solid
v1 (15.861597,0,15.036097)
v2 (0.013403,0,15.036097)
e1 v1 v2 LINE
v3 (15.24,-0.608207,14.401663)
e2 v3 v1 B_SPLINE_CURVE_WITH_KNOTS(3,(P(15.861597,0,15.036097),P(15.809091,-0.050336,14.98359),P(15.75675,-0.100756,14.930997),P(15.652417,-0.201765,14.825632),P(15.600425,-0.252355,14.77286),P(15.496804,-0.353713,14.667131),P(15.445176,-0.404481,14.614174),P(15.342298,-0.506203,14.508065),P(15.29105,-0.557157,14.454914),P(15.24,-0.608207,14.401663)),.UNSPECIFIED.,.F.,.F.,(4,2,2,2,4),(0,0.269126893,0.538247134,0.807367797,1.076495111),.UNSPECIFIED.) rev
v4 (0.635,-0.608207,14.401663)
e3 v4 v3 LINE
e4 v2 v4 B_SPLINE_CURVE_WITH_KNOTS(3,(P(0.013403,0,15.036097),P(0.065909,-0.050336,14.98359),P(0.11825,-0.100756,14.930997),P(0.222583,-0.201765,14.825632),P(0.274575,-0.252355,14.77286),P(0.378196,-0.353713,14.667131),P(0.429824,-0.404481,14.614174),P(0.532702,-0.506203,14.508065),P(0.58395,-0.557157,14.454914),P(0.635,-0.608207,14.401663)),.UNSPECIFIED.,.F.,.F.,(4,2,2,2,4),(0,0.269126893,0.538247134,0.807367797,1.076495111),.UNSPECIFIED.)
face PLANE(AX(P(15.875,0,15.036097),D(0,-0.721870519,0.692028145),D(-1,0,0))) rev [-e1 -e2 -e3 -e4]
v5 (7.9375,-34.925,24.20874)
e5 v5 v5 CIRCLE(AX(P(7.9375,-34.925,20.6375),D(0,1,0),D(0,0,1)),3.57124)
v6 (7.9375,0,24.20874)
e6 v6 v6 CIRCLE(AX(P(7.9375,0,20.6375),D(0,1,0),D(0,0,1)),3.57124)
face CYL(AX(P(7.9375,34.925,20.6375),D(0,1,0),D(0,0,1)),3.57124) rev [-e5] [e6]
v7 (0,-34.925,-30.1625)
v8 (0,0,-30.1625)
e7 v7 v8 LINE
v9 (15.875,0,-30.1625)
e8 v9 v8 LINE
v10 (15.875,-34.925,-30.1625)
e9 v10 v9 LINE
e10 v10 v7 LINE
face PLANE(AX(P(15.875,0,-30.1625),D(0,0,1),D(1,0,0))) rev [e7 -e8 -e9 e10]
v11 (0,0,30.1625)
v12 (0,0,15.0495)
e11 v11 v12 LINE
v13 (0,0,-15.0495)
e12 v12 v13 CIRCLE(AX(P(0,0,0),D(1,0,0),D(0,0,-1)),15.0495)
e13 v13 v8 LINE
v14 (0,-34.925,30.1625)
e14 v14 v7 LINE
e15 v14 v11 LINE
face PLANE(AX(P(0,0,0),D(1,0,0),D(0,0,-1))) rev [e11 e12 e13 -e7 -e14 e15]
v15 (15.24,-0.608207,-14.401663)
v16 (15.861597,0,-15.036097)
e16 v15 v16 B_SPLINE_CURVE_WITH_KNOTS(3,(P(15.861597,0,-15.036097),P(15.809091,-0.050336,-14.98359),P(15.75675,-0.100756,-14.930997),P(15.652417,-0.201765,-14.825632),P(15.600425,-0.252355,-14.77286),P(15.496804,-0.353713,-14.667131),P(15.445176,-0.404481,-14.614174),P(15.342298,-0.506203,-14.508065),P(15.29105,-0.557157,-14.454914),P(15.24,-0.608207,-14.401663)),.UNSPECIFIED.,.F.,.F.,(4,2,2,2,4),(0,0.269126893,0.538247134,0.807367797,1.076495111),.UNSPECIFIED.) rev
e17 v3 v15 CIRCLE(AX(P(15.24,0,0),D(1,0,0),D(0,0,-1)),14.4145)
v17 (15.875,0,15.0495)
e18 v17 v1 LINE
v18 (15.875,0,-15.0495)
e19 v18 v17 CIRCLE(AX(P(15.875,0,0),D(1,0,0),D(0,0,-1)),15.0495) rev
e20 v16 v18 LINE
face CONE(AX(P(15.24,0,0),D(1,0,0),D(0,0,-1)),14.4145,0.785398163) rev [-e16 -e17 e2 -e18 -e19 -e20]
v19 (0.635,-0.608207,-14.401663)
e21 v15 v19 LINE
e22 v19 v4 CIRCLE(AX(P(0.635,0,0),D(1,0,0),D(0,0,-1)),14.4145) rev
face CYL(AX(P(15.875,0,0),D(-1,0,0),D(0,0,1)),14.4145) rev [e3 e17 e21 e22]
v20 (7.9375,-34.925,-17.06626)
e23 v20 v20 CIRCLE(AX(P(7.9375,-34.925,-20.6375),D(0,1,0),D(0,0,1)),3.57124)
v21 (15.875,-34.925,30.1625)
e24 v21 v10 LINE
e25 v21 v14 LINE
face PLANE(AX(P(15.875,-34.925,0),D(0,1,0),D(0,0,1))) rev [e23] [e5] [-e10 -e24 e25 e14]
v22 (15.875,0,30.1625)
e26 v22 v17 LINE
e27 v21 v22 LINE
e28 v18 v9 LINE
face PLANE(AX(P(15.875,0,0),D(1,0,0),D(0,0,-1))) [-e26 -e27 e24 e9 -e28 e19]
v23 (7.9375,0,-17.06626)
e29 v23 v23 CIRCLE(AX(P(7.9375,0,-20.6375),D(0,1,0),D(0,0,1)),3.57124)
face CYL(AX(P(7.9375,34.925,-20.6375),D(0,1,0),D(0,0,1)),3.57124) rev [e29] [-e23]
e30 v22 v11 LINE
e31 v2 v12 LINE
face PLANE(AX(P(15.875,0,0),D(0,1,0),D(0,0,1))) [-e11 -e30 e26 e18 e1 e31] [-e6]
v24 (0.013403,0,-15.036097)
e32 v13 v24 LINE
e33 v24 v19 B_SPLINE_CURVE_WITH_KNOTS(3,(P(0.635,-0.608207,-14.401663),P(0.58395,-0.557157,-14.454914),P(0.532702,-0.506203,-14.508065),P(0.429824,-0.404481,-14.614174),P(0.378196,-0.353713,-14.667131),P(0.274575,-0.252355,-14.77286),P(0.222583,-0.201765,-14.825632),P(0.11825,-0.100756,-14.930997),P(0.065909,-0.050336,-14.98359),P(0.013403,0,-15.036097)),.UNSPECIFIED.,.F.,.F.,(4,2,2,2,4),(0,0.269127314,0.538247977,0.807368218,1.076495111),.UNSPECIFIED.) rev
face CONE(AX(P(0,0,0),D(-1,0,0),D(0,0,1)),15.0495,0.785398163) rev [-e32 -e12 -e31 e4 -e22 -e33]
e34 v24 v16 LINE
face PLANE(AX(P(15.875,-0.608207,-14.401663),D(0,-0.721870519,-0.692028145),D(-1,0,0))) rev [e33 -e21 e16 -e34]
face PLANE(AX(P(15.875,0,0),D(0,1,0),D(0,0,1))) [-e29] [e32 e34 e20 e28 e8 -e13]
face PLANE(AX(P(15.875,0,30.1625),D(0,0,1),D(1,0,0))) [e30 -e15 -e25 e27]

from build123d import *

# Parameters (mm, degrees)
BOSS_EXTRUDE1_DEPTH                           = 15.875
BOSS_EXTRUDE2_DEPTH                           = 15.875
CBORE_FOR_1_4_SOCKET_HEAD_CAP_SCREW1_AT_COUNT = 2
CBORE_FOR_1_4_SOCKET_HEAD_CAP_SCREW1_AT_PITCH = 41.275
MOVE_FACE1_BY                                 = 0.127
MOVE_FACE1_2_BY                               = 0.127
MOVE_START                                    = 28.575
MOVE_FACE2_OUTLINE_W                          = 15.875
MOVE_FACE2_OUTLINE_H                          = 60.325
MOVE_FACE2_OUTLINE_R                          = 5.55625
MOVE_FACE2_DEPTH                              = 6.35
MOVE_START_2                                  = 22.225
MOVE_FACE2_2_OUTLINE_R                        = 5.55625
MOVE_FACE2_2_OUTLINE_R_2                      = 3.57124
MOVE_FACE2_2_DEPTH                            = 6.35


with BuildPart() as part:
    # Sketch1 → Boss-Extrude1 (new body)
    with BuildSketch(Plane(origin=(0, 0, 0), x_dir=(0, 0, -1), z_dir=(1, 0, 0))):
        with BuildLine():
            Line((30.1625, 0), (14.2875, 0))
            ThreePointArc((14.2875, 0), (0, -14.2875), (-14.2875, 0))
            Line((-14.2875, 0), (-30.1625, 0))
            Line((-30.1625, 0), (-30.1625, -34.925))
            Line((-30.1625, -34.925), (30.1625, -34.925))
            Line((30.1625, -34.925), (30.1625, 0))
        make_face()
    extrude(amount=BOSS_EXTRUDE1_DEPTH)


with BuildPart() as body_2:
    # Sketch1<3> → Boss-Extrude2 (new body)
    with BuildSketch(Plane(origin=(0, 0, 0), x_dir=(0, 0, -1), z_dir=(1, 0, 0))):
        with BuildLine():
            ThreePointArc((-14.2875, 0), (0, 14.2875), (14.2875, 0))
            Line((14.2875, 0), (30.1625, 0))
            Line((30.1625, 0), (30.1625, 34.925))
            Line((30.1625, 34.925), (-30.1625, 34.925))
            Line((-30.1625, 34.925), (-30.1625, 0))
            Line((-30.1625, 0), (-14.2875, 0))
        make_face()
    extrude(amount=BOSS_EXTRUDE2_DEPTH)


with BuildPart() as cbore_for_1_4_socket_head_cap_screw1_tool:
    # Sketch4 → CBORE for 1/4 Socket Head Cap Screw1 (revolve)
    with BuildSketch(Plane(origin=(7.9375, 34.925, 20.6375), x_dir=(0, 0, 1), z_dir=(1, 0, 0))):
        Polygon((0, 0), (0, 69.85), (3.57124, 69.85), (3.57124, 6.35), (5.55625, 6.35), (5.55625, 0.635), (6.19125, 0), align=None)
    cbore_for_1_4_socket_head_cap_screw1 = revolve(axis=Axis((7.9375, 41.275, 20.6375), (0, -1, 0)))


with BuildPart() as part_1:
    add(part.part)

    # CBORE for 1/4 Socket Head Cap Screw1: cut by cbore_for_1_4_socket_head_cap_screw1_tool
    add(cbore_for_1_4_socket_head_cap_screw1_tool.part, mode=Mode.SUBTRACT)


with BuildPart() as body_2_1:
    add(body_2.part)

    # CBORE for 1/4 Socket Head Cap Screw1: cut by cbore_for_1_4_socket_head_cap_screw1_tool
    add(cbore_for_1_4_socket_head_cap_screw1_tool.part, mode=Mode.SUBTRACT)


with BuildPart() as cbore_for_1_4_socket_head_cap_screw1_at_tool:
    # CBORE for 1/4 Socket Head Cap Screw1 at: CBORE for 1/4 Socket Head Cap Screw1 ×2
    with Locations(*[(0, 0, -i * CBORE_FOR_1_4_SOCKET_HEAD_CAP_SCREW1_AT_PITCH) for i in range(1, CBORE_FOR_1_4_SOCKET_HEAD_CAP_SCREW1_AT_COUNT)]):
        add(cbore_for_1_4_socket_head_cap_screw1)


with BuildPart() as part_2:
    add(part_1.part)

    # CBORE for 1/4 Socket Head Cap Screw1 at: cut by cbore_for_1_4_socket_head_cap_screw1_at_tool
    add(cbore_for_1_4_socket_head_cap_screw1_at_tool.part, mode=Mode.SUBTRACT)

    # Move Face1 2: a curved face moved inward by 0.127
    add(Solid.thicken(part_2.faces().sort_by_distance((7.9375, -14.2875, 0))[0], -MOVE_FACE1_2_BY), mode=Mode.SUBTRACT)

    # Chamfer2
    # the kernel refuses this chamfer: 0.635 mm, written as the material it takes off along each edge
    with BuildSketch(Plane(origin=(0, 0, 0), x_dir=(0, 0.1132288377802066, -0.9935689358544497), z_dir=(0, 0.9935689358544497, 0.1132288377802066))) as chamfer2_piece_1:
        with BuildLine():
            Line((15.067460512, 0.017960512), (14.396539488, -0.652960512))
            Line((14.396539488, -0.652960512), (14.383839488, -0.652960512))
            ThreePointArc((14.383839488, -0.652960512), (14.4018, -0.326480256), (14.4018, 0))
            Line((14.4018, 0), (14.4145, 0.0127))
            ThreePointArc((14.4145, 0.0127), (14.740980256, 0.0127), (15.067460512, 0.030660512))
            Line((15.067460512, 0.030660512), (15.067460512, 0.017960512))
        make_face()
    revolve(axis=Axis((0, 0, 0), (-1, 0, 0)), revolution_arc=193.002955297, mode=Mode.SUBTRACT)
    with BuildSketch(Plane(origin=(-1.600435701, 0, -14.4145), x_dir=(0, 0, -1), z_dir=(1, 0, 0))) as chamfer2_piece_2:
        with BuildLine():
            Line((0.639932919, 0.017577515), (-0.031172593, -0.625784266))
            Line((-0.031172593, -0.625784266), (-0.043861283, -0.625248401))
            ThreePointArc((-0.043861283, -0.625248401), (-0.016099091, -0.31288099), (-0.0127, 0))
            Line((-0.0127, 0), (0, 0.0127))
            ThreePointArc((0, 0.0127), (0.319966459, 0.0127), (0.639932919, 0.030277515))
            Line((0.639932919, 0.030277515), (0.639932919, 0.017577515))
        make_face()
    extrude(amount=19.075871403, mode=Mode.SUBTRACT)
    with BuildSketch(Plane(origin=(-1.600435701, 0, 14.4145), x_dir=(0, -0.999777333387341, -0.021101745067597762), z_dir=(1, 0, 0))) as chamfer2_piece_3:
        with BuildLine():
            Line((0.626302721, 0.017960512), (-0.031077302, -0.639419511))
            Line((-0.031077302, -0.639419511), (-0.043774474, -0.639151519))
            ThreePointArc((-0.043774474, -0.639151519), (-0.019449023, -0.319627221), (-0.012697172, 0.000267992))
            Line((-0.012697172, 0.000267992), (0.000267992, 0.012697172))
            ThreePointArc((0.000267992, 0.012697172), (0.313151041, 0.009493172), (0.626034729, 0.030657684))
            Line((0.626034729, 0.030657684), (0.626302721, 0.017960512))
        make_face()
    extrude(amount=19.075871403, mode=Mode.SUBTRACT)
    with BuildSketch(Plane(origin=(15.875, 0, 0), x_dir=(0, 0.11322883778020662, -0.9935689358544497), z_dir=(0, 0.9935689358544497, 0.11322883778020662))) as chamfer2_piece_4:
        with BuildLine():
            Line((14.396539488, 0.652960512), (15.067460512, -0.017960512))
            Line((15.067460512, -0.017960512), (15.067460512, -0.030660512))
            ThreePointArc((15.067460512, -0.030660512), (14.740980256, -0.0127), (14.4145, -0.0127))
            Line((14.4145, -0.0127), (14.4018, 0))
            ThreePointArc((14.4018, 0), (14.4018, 0.326480256), (14.383839488, 0.652960512))
            Line((14.383839488, 0.652960512), (14.396539488, 0.652960512))
        make_face()
    revolve(axis=Axis((15.875, 0, 0), (-1, 0, 0)), revolution_arc=193.002955297, mode=Mode.SUBTRACT)


with BuildPart() as body_2_2:
    add(body_2_1.part)

    # CBORE for 1/4 Socket Head Cap Screw1 at: cut by cbore_for_1_4_socket_head_cap_screw1_at_tool
    add(cbore_for_1_4_socket_head_cap_screw1_at_tool.part, mode=Mode.SUBTRACT)

    # Move Face1: a curved face moved inward by 0.127
    add(Solid.thicken(body_2_2.faces().sort_by_distance((7.9375, 14.2875, 0))[0], -MOVE_FACE1_BY), mode=Mode.SUBTRACT)

    # Move Face2: read off the stored shape, not the designer's step
    # Move Face2 outline → Move Face2 (cut)
    with BuildSketch(Plane(origin=(0, 0, 0), x_dir=(1, 0, 0), z_dir=(0, 1, 0)).offset(MOVE_START)):
        with Locations((7.9375, 0)):
            Rectangle(MOVE_FACE2_OUTLINE_W, MOVE_FACE2_OUTLINE_H)
        with Locations((7.9375, -20.6375)):
            Circle(MOVE_FACE2_OUTLINE_R, mode=Mode.SUBTRACT)
        with Locations((7.9375, 20.6375)):
            Circle(MOVE_FACE2_OUTLINE_R, mode=Mode.SUBTRACT)
    extrude(amount=MOVE_FACE2_DEPTH, mode=Mode.SUBTRACT)

    # Move Face2 2 outline → Move Face2 2 (cut)
    # profile 1 of 2: a face of its own
    with BuildSketch(Plane(origin=(0, 0, 0), x_dir=(1, 0, 0), z_dir=(0, 1, 0)).offset(MOVE_START_2)):
        with Locations((7.9375, 20.6375)):
            Circle(MOVE_FACE2_2_OUTLINE_R)
        with Locations((7.9375, 20.6375)):
            Circle(MOVE_FACE2_2_OUTLINE_R_2, mode=Mode.SUBTRACT)
    # profile 2 of 2: a face of its own
    with BuildSketch(Plane(origin=(0, 0, 0), x_dir=(1, 0, 0), z_dir=(0, 1, 0)).offset(MOVE_START_2)):
        with Locations((7.9375, -20.6375)):
            Circle(MOVE_FACE2_2_OUTLINE_R)
        with Locations((7.9375, -20.6375)):
            Circle(MOVE_FACE2_2_OUTLINE_R_2, mode=Mode.SUBTRACT)
    extrude(amount=MOVE_FACE2_2_DEPTH, mode=Mode.SUBTRACT)

    # Move Face2 3: loft between two sections, ruled curve by curve
    move_face2_3_from = [
        Edge.make_three_point_arc((7.9375, 27.94, -15.08125), (13.49375, 27.94, -20.6375), (7.9375, 27.94, -26.19375)),
        Edge.make_three_point_arc((7.9375, 27.94, -26.19375), (2.38125, 27.94, -20.6375), (7.9375, 27.94, -15.08125)),
    ]
    move_face2_3_to = [
        Edge.make_three_point_arc((7.9375, 28.575, -14.44625), (14.12875, 28.575, -20.6375), (7.9375, 28.575, -26.82875)),
        Edge.make_three_point_arc((7.9375, 28.575, -26.82875), (1.74625, 28.575, -20.6375), (7.9375, 28.575, -14.44625)),
    ]
    move_face2_3 = Solid(Shell([*[Face.make_surface_from_curves(move_face2_3_from[k], move_face2_3_to[k]) for k in range(2)], Face(Wire(move_face2_3_from)), Face(Wire(move_face2_3_to))]))
    add(move_face2_3, mode=Mode.SUBTRACT)

    # Move Face2 4: loft between two sections, ruled curve by curve
    move_face2_4_from = [
        Edge.make_three_point_arc((7.9375, 27.94, 26.19375), (13.49375, 27.94, 20.6375), (7.9375, 27.94, 15.08125)),
        Edge.make_three_point_arc((7.9375, 27.94, 15.08125), (2.38125, 27.94, 20.6375), (7.9375, 27.94, 26.19375)),
    ]
    move_face2_4_to = [
        Edge.make_three_point_arc((7.9375, 28.575, 26.82875), (14.12875, 28.575, 20.6375), (7.9375, 28.575, 14.44625)),
        Edge.make_three_point_arc((7.9375, 28.575, 14.44625), (1.74625, 28.575, 20.6375), (7.9375, 28.575, 26.82875)),
    ]
    move_face2_4 = Solid(Shell([*[Face.make_surface_from_curves(move_face2_4_from[k], move_face2_4_to[k]) for k in range(2)], Face(Wire(move_face2_4_from)), Face(Wire(move_face2_4_to))]))
    add(move_face2_4, mode=Mode.SUBTRACT)

    # Chamfer1
    # the kernel refuses this chamfer: 0.635 mm, written as the material it takes off along each edge
    with BuildSketch(Plane(origin=(0, 0, 0), x_dir=(0, -0.11322883778020673, 0.9935689358544497), z_dir=(0, -0.9935689358544497, -0.11322883778020673))) as chamfer1_piece_1:
        with BuildLine():
            Line((15.067460512, 0.017960512), (14.396539488, -0.652960512))
            Line((14.396539488, -0.652960512), (14.383839488, -0.652960512))
            ThreePointArc((14.383839488, -0.652960512), (14.4018, -0.326480256), (14.4018, 0))
            Line((14.4018, 0), (14.4145, 0.0127))
            ThreePointArc((14.4145, 0.0127), (14.740980256, 0.0127), (15.067460512, 0.030660512))
            Line((15.067460512, 0.030660512), (15.067460512, 0.017960512))
        make_face()
    revolve(axis=Axis((0, 0, 0), (-1, 0, 0)), revolution_arc=193.002955297, mode=Mode.SUBTRACT)
    with BuildSketch(Plane(origin=(-1.600435701, 0, 14.4145), x_dir=(0, 0, 1), z_dir=(1, 0, 0))) as chamfer1_piece_2:
        with BuildLine():
            Line((0.639932919, 0.017577515), (-0.031172593, -0.625784266))
            Line((-0.031172593, -0.625784266), (-0.043861283, -0.625248401))
            ThreePointArc((-0.043861283, -0.625248401), (-0.016099091, -0.31288099), (-0.0127, 0))
            Line((-0.0127, 0), (0, 0.0127))
            ThreePointArc((0, 0.0127), (0.319966459, 0.0127), (0.639932919, 0.030277515))
            Line((0.639932919, 0.030277515), (0.639932919, 0.017577515))
        make_face()
    extrude(amount=19.075871403, mode=Mode.SUBTRACT)
    with BuildSketch(Plane(origin=(-1.600435701, 0, -14.4145), x_dir=(0, 0.999777333387341, 0.021101745067597762), z_dir=(1, 0, 0))) as chamfer1_piece_3:
        with BuildLine():
            Line((0.626302721, 0.017960512), (-0.031077302, -0.639419511))
            Line((-0.031077302, -0.639419511), (-0.043774474, -0.639151519))
            ThreePointArc((-0.043774474, -0.639151519), (-0.019449023, -0.319627221), (-0.012697172, 0.000267992))
            Line((-0.012697172, 0.000267992), (0.000267992, 0.012697172))
            ThreePointArc((0.000267992, 0.012697172), (0.313151041, 0.009493172), (0.626034729, 0.030657684))
            Line((0.626034729, 0.030657684), (0.626302721, 0.017960512))
        make_face()
    extrude(amount=19.075871403, mode=Mode.SUBTRACT)
    with BuildSketch(Plane(origin=(15.875, 0, 0), x_dir=(0, -0.11322883778020675, 0.9935689358544497), z_dir=(0, -0.9935689358544497, -0.11322883778020675))) as chamfer1_piece_4:
        with BuildLine():
            Line((14.396539488, 0.652960512), (15.067460512, -0.017960512))
            Line((15.067460512, -0.017960512), (15.067460512, -0.030660512))
            ThreePointArc((15.067460512, -0.030660512), (14.740980256, -0.0127), (14.4145, -0.0127))
            Line((14.4145, -0.0127), (14.4018, 0))
            ThreePointArc((14.4018, 0), (14.4018, 0.326480256), (14.383839488, 0.652960512))
            Line((14.383839488, 0.652960512), (14.396539488, 0.652960512))
        make_face()
    revolve(axis=Axis((15.875, 0, 0), (-1, 0, 0)), revolution_arc=193.002955297, mode=Mode.SUBTRACT)


solid = part_2.part
